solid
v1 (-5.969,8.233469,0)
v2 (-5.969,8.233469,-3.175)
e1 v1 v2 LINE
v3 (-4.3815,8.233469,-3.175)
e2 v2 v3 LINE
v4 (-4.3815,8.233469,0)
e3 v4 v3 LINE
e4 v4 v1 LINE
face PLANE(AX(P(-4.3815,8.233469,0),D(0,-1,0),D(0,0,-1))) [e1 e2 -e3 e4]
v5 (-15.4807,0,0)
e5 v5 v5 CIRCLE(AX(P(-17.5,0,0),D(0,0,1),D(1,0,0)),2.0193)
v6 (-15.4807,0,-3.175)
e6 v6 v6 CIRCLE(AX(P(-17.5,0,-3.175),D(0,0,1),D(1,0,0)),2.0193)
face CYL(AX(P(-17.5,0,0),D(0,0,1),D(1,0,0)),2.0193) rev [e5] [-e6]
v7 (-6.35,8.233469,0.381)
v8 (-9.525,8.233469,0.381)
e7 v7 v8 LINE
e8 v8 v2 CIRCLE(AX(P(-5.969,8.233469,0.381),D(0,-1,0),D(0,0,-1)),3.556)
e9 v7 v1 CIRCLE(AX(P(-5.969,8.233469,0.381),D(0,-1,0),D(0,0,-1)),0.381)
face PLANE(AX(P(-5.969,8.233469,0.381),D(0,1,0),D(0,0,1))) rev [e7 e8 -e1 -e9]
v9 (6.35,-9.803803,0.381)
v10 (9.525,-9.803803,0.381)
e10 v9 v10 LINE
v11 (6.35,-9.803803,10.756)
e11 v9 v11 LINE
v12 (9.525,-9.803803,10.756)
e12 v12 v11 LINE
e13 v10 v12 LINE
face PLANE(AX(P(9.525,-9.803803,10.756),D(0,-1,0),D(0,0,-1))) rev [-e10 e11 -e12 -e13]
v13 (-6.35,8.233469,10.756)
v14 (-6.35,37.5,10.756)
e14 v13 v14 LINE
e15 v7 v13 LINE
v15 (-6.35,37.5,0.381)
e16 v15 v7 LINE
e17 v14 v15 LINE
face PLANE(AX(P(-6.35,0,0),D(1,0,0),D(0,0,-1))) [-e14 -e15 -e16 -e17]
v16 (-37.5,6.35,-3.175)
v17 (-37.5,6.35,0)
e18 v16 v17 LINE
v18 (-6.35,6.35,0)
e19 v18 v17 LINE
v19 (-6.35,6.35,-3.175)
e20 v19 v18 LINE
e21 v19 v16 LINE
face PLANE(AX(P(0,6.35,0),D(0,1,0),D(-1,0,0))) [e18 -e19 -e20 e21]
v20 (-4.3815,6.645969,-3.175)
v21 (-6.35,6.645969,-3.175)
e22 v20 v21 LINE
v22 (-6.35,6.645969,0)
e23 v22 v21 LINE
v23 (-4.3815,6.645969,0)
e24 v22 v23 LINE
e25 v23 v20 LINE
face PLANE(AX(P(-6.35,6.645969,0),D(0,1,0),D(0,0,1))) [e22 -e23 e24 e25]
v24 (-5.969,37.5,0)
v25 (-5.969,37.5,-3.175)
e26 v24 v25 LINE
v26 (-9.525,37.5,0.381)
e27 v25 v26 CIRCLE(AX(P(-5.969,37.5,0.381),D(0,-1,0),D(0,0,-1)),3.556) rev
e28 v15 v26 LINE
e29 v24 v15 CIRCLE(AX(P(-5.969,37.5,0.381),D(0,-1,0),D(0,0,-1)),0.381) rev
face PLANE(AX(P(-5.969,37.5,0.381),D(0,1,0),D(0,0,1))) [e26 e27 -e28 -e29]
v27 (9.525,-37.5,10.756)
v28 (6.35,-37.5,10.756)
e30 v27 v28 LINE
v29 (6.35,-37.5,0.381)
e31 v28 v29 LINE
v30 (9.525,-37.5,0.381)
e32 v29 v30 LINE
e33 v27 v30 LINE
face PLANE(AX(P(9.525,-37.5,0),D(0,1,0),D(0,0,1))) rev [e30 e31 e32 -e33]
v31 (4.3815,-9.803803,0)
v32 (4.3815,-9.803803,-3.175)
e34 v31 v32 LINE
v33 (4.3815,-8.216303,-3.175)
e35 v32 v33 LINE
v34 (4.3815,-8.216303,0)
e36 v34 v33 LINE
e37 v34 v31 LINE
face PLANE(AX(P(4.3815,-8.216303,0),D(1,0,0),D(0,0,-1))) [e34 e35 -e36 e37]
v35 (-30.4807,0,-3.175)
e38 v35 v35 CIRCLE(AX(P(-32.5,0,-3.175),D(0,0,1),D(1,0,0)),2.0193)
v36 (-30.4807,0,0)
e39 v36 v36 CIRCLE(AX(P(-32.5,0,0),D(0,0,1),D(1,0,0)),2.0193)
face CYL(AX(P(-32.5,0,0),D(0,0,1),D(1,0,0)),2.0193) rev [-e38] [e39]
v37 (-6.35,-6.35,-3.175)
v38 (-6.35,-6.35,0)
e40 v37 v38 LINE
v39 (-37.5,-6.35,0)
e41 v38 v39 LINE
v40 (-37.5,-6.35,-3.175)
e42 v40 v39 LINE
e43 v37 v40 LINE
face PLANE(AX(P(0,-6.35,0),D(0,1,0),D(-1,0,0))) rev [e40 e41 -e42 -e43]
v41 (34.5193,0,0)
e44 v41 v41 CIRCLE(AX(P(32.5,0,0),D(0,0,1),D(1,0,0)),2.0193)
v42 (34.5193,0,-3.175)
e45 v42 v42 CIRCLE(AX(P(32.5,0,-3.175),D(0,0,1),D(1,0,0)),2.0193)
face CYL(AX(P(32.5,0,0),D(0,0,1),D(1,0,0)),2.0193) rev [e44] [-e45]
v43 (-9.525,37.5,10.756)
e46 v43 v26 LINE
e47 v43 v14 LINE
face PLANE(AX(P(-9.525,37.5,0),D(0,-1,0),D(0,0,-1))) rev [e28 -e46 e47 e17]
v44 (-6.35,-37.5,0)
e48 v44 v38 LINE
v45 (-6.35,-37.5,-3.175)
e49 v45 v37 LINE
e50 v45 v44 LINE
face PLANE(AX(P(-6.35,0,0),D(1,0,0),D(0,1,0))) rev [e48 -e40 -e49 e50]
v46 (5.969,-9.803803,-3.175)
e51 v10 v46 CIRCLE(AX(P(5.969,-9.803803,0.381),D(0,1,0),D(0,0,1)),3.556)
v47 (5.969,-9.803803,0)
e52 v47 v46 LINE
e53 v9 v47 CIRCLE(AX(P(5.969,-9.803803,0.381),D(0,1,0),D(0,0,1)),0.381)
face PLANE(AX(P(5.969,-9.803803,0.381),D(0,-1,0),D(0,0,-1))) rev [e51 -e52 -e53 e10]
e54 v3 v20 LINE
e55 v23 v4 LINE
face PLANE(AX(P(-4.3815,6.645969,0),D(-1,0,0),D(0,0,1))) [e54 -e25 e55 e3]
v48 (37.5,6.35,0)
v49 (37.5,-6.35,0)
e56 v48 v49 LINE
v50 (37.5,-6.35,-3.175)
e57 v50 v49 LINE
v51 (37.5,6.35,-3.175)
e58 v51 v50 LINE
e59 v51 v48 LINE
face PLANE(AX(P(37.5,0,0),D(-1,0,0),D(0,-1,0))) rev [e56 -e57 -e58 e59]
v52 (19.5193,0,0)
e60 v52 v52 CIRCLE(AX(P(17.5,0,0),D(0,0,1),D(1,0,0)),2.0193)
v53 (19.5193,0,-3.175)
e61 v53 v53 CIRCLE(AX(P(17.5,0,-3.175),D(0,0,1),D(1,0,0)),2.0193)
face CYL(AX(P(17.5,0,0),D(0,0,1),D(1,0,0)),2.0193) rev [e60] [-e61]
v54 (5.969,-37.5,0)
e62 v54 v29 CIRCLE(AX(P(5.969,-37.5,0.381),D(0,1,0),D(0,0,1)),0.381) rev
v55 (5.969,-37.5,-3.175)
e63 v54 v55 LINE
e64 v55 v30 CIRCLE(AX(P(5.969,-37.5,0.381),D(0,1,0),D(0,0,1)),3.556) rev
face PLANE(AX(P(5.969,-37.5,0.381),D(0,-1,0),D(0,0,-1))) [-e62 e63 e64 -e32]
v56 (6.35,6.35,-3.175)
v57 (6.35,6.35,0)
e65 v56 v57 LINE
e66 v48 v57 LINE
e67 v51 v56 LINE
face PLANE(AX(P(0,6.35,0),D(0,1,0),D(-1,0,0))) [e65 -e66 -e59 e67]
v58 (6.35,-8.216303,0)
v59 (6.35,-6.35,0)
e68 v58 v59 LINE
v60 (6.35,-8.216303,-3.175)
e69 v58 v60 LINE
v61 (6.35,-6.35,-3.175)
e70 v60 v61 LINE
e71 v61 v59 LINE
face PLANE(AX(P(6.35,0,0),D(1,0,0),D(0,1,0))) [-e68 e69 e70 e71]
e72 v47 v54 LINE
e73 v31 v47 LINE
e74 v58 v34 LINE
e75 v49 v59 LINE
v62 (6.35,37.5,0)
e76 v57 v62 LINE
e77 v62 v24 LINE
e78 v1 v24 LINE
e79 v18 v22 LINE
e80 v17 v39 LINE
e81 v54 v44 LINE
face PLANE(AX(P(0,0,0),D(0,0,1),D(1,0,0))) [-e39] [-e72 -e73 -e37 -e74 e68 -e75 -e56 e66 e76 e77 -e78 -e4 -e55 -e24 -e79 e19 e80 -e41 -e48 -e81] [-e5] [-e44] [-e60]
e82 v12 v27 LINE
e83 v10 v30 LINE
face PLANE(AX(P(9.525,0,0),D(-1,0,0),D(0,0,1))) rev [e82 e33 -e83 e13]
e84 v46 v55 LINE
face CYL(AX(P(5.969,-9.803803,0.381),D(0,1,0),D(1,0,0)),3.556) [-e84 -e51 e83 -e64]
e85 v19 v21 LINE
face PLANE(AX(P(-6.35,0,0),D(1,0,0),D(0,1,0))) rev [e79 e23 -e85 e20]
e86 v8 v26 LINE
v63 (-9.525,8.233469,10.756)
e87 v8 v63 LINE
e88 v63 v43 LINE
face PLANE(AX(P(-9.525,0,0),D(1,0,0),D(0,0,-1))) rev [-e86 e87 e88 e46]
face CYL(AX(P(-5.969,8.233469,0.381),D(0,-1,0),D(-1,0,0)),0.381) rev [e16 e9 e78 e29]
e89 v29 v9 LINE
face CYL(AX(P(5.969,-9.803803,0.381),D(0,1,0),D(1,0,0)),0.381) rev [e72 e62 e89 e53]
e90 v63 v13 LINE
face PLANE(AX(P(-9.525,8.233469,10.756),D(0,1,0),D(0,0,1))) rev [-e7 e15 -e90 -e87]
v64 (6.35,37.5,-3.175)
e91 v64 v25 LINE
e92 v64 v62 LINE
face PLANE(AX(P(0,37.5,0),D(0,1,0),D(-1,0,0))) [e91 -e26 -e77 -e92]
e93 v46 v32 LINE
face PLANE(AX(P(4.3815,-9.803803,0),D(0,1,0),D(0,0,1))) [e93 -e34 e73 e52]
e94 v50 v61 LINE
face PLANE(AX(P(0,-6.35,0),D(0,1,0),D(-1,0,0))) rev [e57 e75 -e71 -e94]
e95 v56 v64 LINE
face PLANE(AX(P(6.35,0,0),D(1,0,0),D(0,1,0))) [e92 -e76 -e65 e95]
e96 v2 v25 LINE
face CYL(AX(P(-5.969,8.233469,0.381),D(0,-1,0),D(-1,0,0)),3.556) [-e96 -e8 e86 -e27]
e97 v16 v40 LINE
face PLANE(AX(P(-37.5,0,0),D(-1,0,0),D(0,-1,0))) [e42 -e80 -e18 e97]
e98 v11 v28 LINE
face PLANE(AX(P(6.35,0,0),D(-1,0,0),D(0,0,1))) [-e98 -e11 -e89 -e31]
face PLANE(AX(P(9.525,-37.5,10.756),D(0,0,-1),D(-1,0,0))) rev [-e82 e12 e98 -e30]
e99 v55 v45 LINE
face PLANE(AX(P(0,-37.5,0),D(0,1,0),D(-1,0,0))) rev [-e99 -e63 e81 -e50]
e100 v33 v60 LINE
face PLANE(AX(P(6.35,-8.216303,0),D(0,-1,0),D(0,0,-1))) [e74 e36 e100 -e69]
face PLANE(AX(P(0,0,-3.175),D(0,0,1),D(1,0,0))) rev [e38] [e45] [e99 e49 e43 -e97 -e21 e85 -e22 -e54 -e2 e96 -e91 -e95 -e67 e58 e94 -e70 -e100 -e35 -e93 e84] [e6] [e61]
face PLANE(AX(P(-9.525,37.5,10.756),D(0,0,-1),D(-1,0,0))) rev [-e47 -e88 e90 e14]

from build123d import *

# Parameters (mm, degrees)
SKETCH1_W                       = 31.15
SKETCH1_H                       = 12.7
SKETCH1_W_2                     = 12.7
SKETCH1_H_2                     = 31.15
BOSS_EXTRUDE1_DEPTH             = 3.175
F_10_32_TAPPED_HOLE1_D          = 4.0386
F_10_32_TAPPED_HOLE1_DEPTH      = 12.7
F_10_32_TAPPED_HOLE1_TIP        = 1.213317848
EDGE_FLANGE1_STRIP_W            = 13.462
EDGE_FLANGE1_STRIP_H            = 3.175
EDGE_FLANGE1_STRIP_CUT_DEPTH    = 27.696197319
EDGE_FLANGE1_RELIEF_W           = 15.0495
EDGE_FLANGE1_RELIEF_H           = 1.5875
EDGE_FLANGE1_RELIEF_CUT_DEPTH   = 3.175
EDGE_FLANGE1_STRIP_2_W          = 13.462
EDGE_FLANGE1_STRIP_2_H          = 3.175
EDGE_FLANGE1_STRIP_CUT_2_DEPTH  = 29.266530926
EDGE_FLANGE1_RELIEF_2_W         = 15.0495
EDGE_FLANGE1_RELIEF_2_H         = 1.5875
EDGE_FLANGE1_RELIEF_CUT_2_DEPTH = 3.175
EDGE_FLANGE1_DEPTH              = 27.696197319
EDGE_FLANGE1_BEND_DEPTH         = 29.266530926


# Sheet-metal steps are written as plain solids
with BuildPart() as part:
    # Sketch1 → Boss-Extrude1 (new body)
    with BuildSketch(Plane.XY):
        with Locations((-21.925, 0)):
            Rectangle(SKETCH1_W, SKETCH1_H)
        Rectangle(SKETCH1_W_2, SKETCH1_H)
        with Locations((0, -21.925)):
            Rectangle(SKETCH1_W_2, SKETCH1_H_2)
        with Locations((21.925, 0)):
            Rectangle(SKETCH1_W, SKETCH1_H)
        with Locations((0, 21.925)):
            Rectangle(SKETCH1_W_2, SKETCH1_H_2)
    extrude(amount=-BOSS_EXTRUDE1_DEPTH)

    # #10-32 Tapped Hole1
    with Locations(Plane.XY):
        with Locations((-17.5, 0), (-32.5, 0), (17.5, 0), (32.5, 0)):
            Hole(F_10_32_TAPPED_HOLE1_D / 2, depth=F_10_32_TAPPED_HOLE1_DEPTH)
            with Locations((0, 0, -(F_10_32_TAPPED_HOLE1_DEPTH + F_10_32_TAPPED_HOLE1_TIP / 2))):  # 118° drill point
                Cone(0, F_10_32_TAPPED_HOLE1_D / 2, F_10_32_TAPPED_HOLE1_TIP, mode=Mode.SUBTRACT)

    # Edge-Flange1 strip (across the edge) → Edge-Flange1 strip cut (cut)
    with BuildSketch(Plane(origin=(6.35, -37.5, 0), x_dir=(-1, 0, 0), z_dir=(0, 1, 0))):
        with Locations((-6.35, -1.5875)):
            Rectangle(EDGE_FLANGE1_STRIP_W, EDGE_FLANGE1_STRIP_H)
    extrude(amount=EDGE_FLANGE1_STRIP_CUT_DEPTH, mode=Mode.SUBTRACT)

    # Edge-Flange1 relief (on the sheet) → Edge-Flange1 relief cut (cut)
    with BuildSketch(Plane(origin=(5.969, -37.5, 0), x_dir=(-1, 0, 0), z_dir=(0, 0, 1))):
        with Locations((-5.93725, -28.489947319)):
            Rectangle(EDGE_FLANGE1_RELIEF_W, EDGE_FLANGE1_RELIEF_H)
    extrude(amount=-EDGE_FLANGE1_RELIEF_CUT_DEPTH, mode=Mode.SUBTRACT)

    # Edge-Flange1 strip 2 (across the edge) → Edge-Flange1 strip cut 2 (cut)
    with BuildSketch(Plane(origin=(-6.35, 37.5, 0), x_dir=(1, 0, 0), z_dir=(0, -1, 0))):
        with Locations((-6.35, -1.5875)):
            Rectangle(EDGE_FLANGE1_STRIP_2_W, EDGE_FLANGE1_STRIP_2_H)
    extrude(amount=EDGE_FLANGE1_STRIP_CUT_2_DEPTH, mode=Mode.SUBTRACT)

    # Edge-Flange1 relief 2 (on the sheet) → Edge-Flange1 relief cut 2 (cut)
    with BuildSketch(Plane(origin=(-5.969, 37.5, 0), x_dir=(1, 0, 0), z_dir=(0, 0, 1))):
        with Locations((-5.93725, -30.060280926)):
            Rectangle(EDGE_FLANGE1_RELIEF_2_W, EDGE_FLANGE1_RELIEF_2_H)
    extrude(amount=-EDGE_FLANGE1_RELIEF_CUT_2_DEPTH, mode=Mode.SUBTRACT)

    # Edge-Flange1 section (across the edge) → Edge-Flange1 (add)
    with BuildSketch(Plane(origin=(6.35, -37.5, 0), x_dir=(-1, 0, 0), z_dir=(0, 1, 0))):
        with BuildLine():
            Line((-3.175, 0.381), (-3.175, 10.756))
            Line((-3.175, 10.756), (0, 10.756))
            Line((0, 10.756), (0, 0.381))
            ThreePointArc((0, 0.381), (0.111592316, 0.111592316), (0.381, 0))
            Line((0.381, 0), (0.381, -3.175))
            ThreePointArc((0.381, -3.175), (-2.133471714, -2.133471714), (-3.175, 0.381))
        make_face()
    extrude(amount=EDGE_FLANGE1_DEPTH)

    # Edge-Flange1 section 2 (across the edge) → Edge-Flange1 bend (add)
    with BuildSketch(Plane(origin=(-6.35, 37.5, 0), x_dir=(1, 0, 0), z_dir=(0, -1, 0))):
        with BuildLine():
            Line((-3.175, 0.381), (-3.175, 10.756))
            Line((-3.175, 10.756), (0, 10.756))
            Line((0, 10.756), (0, 0.381))
            ThreePointArc((0, 0.381), (0.111592316, 0.111592316), (0.381, 0))
            Line((0.381, 0), (0.381, -3.175))
            ThreePointArc((0.381, -3.175), (-2.133471714, -2.133471714), (-3.175, 0.381))
        make_face()
    extrude(amount=EDGE_FLANGE1_BEND_DEPTH)


solid = part.part
